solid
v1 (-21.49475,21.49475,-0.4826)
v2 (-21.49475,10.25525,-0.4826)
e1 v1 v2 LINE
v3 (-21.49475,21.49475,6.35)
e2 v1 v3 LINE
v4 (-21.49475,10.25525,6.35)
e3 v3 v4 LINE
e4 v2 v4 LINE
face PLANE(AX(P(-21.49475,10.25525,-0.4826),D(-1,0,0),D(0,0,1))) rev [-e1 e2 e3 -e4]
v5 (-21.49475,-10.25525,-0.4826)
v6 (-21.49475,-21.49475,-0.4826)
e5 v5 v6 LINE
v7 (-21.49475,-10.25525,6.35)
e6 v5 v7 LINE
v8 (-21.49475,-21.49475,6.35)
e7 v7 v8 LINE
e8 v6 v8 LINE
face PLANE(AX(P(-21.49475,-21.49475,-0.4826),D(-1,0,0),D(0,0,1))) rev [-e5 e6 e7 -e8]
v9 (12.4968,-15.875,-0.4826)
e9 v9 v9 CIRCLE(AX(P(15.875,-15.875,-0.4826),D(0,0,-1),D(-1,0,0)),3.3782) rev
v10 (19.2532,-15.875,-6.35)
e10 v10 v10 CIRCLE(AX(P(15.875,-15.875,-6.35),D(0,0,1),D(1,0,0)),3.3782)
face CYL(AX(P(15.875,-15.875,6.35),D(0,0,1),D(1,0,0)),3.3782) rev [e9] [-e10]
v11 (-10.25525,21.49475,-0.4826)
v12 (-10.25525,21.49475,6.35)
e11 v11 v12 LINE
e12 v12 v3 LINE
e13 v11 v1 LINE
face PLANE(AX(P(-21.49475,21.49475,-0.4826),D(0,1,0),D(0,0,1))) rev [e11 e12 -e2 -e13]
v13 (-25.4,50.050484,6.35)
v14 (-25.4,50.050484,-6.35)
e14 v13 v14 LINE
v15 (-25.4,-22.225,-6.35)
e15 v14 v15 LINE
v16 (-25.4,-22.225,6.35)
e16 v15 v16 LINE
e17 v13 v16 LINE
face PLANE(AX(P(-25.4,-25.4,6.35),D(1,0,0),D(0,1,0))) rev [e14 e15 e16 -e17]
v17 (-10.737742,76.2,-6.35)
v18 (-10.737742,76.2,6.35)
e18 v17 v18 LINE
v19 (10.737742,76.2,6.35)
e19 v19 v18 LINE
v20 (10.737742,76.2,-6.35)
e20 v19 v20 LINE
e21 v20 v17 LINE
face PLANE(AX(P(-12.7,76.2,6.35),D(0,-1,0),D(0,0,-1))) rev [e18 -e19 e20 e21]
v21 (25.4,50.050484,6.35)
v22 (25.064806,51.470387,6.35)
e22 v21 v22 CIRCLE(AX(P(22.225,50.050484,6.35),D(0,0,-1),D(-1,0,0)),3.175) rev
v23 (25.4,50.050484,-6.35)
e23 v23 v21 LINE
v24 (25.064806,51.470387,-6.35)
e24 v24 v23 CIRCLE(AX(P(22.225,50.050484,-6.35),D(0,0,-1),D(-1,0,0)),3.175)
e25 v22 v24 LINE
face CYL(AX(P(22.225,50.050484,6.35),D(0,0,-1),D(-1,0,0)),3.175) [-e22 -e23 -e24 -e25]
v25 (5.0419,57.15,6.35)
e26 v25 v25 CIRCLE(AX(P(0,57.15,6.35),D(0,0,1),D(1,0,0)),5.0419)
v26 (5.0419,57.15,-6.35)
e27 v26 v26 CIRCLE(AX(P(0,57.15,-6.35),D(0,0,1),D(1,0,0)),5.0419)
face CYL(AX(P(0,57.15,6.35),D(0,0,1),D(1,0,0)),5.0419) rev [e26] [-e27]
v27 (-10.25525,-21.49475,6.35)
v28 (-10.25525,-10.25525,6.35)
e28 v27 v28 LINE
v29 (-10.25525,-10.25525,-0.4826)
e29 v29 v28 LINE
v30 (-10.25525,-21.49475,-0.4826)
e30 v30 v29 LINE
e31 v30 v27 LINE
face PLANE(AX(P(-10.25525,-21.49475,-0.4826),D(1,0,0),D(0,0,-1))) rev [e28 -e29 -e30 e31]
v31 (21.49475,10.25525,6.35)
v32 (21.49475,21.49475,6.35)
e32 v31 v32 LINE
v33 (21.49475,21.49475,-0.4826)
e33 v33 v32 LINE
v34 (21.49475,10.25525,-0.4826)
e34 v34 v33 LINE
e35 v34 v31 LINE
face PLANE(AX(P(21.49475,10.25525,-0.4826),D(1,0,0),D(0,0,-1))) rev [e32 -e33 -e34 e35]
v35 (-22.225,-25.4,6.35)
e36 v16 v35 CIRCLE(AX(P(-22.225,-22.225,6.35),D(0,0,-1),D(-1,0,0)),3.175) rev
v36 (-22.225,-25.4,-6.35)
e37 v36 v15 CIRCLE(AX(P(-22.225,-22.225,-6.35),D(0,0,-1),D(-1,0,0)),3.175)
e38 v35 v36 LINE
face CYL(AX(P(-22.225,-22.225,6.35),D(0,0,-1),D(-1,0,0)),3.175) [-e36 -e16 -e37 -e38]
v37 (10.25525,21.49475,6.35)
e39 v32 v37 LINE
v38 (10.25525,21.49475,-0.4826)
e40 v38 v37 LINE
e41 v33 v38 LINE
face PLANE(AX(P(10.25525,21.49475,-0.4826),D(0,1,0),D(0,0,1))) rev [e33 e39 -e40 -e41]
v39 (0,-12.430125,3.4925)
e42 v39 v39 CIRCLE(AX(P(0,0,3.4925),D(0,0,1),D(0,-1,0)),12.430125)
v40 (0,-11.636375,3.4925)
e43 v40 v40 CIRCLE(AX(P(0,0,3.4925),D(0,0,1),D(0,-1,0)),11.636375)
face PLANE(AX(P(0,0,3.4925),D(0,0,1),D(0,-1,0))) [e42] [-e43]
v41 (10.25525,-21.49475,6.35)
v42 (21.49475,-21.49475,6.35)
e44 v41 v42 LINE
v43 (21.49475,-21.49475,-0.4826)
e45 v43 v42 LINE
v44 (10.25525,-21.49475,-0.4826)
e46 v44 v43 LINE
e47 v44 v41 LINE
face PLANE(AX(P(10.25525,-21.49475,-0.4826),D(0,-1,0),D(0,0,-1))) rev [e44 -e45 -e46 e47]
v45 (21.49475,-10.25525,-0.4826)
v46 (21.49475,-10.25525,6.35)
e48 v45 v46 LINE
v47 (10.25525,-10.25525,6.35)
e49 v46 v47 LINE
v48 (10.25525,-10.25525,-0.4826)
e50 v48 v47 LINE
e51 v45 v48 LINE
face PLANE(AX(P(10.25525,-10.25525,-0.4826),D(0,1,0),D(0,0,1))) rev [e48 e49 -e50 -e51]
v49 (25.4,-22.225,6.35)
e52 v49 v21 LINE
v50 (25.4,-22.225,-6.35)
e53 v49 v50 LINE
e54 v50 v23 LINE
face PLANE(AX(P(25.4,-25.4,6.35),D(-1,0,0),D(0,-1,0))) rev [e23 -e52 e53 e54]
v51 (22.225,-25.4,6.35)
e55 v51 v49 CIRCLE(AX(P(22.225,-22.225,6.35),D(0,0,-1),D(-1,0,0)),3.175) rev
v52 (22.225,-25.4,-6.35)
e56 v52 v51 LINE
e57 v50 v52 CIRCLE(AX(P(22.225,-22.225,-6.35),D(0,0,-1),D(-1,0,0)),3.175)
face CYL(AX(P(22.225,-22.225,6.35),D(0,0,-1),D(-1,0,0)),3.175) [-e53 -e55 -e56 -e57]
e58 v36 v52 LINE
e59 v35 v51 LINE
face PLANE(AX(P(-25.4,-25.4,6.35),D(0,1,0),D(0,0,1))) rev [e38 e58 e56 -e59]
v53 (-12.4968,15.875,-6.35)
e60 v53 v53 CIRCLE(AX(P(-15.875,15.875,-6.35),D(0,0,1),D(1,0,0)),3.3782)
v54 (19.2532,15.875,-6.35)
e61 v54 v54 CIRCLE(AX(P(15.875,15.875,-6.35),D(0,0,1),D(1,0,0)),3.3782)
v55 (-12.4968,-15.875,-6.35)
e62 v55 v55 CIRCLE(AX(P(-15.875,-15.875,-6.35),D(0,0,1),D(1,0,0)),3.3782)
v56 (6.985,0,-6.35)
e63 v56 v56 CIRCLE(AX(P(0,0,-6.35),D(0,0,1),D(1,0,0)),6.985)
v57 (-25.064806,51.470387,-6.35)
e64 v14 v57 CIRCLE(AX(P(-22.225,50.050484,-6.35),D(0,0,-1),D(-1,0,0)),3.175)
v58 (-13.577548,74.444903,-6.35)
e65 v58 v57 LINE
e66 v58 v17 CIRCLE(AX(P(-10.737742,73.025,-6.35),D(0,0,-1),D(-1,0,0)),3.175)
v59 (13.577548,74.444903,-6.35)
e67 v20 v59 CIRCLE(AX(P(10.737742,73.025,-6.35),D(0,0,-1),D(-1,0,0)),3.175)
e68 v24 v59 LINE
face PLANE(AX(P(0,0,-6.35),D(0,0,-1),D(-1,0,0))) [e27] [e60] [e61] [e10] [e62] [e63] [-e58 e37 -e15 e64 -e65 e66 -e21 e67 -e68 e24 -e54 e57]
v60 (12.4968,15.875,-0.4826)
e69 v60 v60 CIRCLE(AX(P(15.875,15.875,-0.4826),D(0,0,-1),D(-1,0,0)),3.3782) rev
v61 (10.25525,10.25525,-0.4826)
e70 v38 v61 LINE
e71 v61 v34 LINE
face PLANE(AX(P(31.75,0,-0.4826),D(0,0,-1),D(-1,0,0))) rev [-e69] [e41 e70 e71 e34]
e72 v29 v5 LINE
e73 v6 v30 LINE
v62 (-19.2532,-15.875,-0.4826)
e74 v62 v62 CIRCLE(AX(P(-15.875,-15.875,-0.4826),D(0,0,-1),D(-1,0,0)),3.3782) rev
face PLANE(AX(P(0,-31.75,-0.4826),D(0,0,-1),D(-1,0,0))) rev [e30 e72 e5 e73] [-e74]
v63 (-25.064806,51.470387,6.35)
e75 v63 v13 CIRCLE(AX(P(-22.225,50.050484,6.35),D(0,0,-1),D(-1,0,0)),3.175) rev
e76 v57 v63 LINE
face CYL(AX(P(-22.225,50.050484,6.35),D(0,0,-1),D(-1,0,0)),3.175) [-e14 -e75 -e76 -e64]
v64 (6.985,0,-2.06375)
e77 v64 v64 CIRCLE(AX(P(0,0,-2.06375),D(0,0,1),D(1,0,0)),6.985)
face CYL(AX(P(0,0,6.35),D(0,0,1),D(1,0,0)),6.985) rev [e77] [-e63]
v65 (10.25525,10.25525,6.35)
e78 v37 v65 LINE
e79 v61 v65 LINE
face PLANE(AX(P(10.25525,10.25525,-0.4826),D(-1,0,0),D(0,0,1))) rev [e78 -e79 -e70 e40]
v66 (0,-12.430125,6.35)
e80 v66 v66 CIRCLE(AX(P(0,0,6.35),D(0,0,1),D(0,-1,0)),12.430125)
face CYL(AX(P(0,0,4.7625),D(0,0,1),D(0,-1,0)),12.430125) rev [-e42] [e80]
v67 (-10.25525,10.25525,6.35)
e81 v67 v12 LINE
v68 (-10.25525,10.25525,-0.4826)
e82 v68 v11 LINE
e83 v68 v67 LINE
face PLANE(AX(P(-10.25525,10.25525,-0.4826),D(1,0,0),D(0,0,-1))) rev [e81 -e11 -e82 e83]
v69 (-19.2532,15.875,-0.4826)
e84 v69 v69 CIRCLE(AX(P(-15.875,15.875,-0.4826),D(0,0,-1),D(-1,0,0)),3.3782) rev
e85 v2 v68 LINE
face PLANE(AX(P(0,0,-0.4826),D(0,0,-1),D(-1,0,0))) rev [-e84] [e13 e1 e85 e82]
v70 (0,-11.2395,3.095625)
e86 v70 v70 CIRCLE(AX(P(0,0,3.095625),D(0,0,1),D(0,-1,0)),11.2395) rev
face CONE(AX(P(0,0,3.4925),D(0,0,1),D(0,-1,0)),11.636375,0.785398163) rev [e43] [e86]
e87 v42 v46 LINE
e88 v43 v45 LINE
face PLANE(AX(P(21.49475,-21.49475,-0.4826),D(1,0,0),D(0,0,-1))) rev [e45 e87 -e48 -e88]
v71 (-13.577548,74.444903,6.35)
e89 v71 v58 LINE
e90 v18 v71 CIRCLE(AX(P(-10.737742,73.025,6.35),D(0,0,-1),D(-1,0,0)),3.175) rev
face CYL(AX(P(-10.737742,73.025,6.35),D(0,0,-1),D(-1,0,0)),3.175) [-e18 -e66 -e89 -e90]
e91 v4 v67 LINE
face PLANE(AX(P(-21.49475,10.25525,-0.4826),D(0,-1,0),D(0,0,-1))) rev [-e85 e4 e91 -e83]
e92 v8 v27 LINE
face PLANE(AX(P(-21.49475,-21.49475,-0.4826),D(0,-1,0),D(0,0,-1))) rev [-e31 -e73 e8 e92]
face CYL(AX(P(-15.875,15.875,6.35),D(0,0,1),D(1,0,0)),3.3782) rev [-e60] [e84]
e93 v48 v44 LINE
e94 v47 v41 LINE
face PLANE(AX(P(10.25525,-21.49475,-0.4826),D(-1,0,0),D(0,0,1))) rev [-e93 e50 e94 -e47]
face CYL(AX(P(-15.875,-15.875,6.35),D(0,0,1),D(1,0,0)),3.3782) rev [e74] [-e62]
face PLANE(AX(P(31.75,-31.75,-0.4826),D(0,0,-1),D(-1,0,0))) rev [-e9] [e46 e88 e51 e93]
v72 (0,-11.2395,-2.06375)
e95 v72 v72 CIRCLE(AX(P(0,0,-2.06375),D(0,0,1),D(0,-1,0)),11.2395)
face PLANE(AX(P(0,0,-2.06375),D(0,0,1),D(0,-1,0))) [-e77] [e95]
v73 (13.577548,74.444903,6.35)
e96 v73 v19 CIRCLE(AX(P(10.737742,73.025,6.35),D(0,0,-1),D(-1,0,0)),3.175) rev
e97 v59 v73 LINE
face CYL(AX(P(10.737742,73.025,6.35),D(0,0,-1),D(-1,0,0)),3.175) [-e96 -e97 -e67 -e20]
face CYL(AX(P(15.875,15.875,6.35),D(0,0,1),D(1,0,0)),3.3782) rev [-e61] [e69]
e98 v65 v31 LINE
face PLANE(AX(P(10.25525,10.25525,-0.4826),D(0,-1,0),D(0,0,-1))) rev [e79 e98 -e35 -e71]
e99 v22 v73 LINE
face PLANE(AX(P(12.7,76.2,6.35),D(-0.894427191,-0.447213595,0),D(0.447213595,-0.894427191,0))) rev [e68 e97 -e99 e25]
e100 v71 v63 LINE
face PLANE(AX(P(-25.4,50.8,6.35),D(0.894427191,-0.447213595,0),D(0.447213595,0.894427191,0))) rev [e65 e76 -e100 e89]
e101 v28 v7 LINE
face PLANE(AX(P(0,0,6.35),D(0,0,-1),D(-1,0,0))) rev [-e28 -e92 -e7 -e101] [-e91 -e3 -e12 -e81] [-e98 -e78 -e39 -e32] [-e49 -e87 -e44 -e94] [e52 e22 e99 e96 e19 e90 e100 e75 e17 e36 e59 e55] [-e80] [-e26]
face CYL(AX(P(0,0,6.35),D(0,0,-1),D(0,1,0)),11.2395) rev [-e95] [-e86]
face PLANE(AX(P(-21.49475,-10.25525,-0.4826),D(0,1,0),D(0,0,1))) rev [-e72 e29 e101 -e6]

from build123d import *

# Parameters (mm, degrees)
BOSS_EXTRUDE1_DEPTH     = 6.35
F_3_8_CLEARANCE_HOLE1_D = 10.0838
BODY_MOVE_COPY2_ANGLE   = 90
F_1_4_CLEARANCE_HOLE1_D = 6.7564
SKETCH6_W               = 11.2395
SKETCH6_H               = 11.2395
CUT_EXTRUDE1_DEPTH      = 6.8326
F_3_8_CLEARANCE_HOLE3_D = 10.0838
FILLET1_R               = 3.175
F_3_8_CLEARANCE_HOLE2_D = 13.97


with BuildPart() as part:
    # Sketch2 → Boss-Extrude1 (new, symmetric)
    with BuildSketch(Plane.XY):
        Polygon((-25.4, -25.4), (25.4, -25.4), (25.4, 50.8), (12.7, 76.2), (-12.7, 76.2), (-25.4, 50.8), align=None)
    extrude(amount=BOSS_EXTRUDE1_DEPTH, both=True)

    # 3/8 Clearance Hole1 (through all)
    with Locations(Plane.XY.offset(6.35)):
        with Locations((0, 0), (0, 57.15)):
            Hole(F_3_8_CLEARANCE_HOLE1_D / 2)


with BuildPart() as body_2:
    # uxcell-FR6ZZ: read off the stored shape, not the designer's step
    # uxcell-FR6ZZ outline → uxcell-FR6ZZ (revolve)
    with BuildSketch(Plane(origin=(-48.38860798, 0, 0), x_dir=(1, 0, 0), z_dir=(0, 0, 1))):
        Polygon((12.430125, 12.468326067), (4.7625, 12.468326067), (4.7625, 4.054576067), (11.2395, 4.054576067), (11.2395, 9.213951067), (11.636375, 9.610826067), (12.430125, 9.610826067), align=None)
    revolve(axis=Axis((-48.38860798, 0, 0), (0, 1, 0)))


with BuildPart() as body_2_1:
    # Body-Move/Copy2: read off the stored shape, not the designer's step
    # Body-Move/Copy2: moved
    add(body_2.part.moved(Location((48.388608, -6.1183261, 0))).rotate(Axis((0, 0, 0), (1, 0, 0)), BODY_MOVE_COPY2_ANGLE))


with BuildPart() as part_1:
    add(part.part)

    # Combine1: cut body 2
    add(body_2_1.part, mode=Mode.SUBTRACT)

    # 1/4 Clearance Hole1 (through all)
    with Locations(Plane.XY.offset(6.35)):
        with Locations((-15.875, 15.875), (15.875, 15.875), (15.875, -15.875), (-15.875, -15.875)):
            Hole(F_1_4_CLEARANCE_HOLE1_D / 2)

    # Sketch6 → Cut-Extrude1 (cut)
    with BuildSketch(Plane.XY.offset(6.35)):
        with Locations((-15.875, 15.875)):
            Rectangle(SKETCH6_W, SKETCH6_H)
    cut_extrude1 = extrude(amount=-CUT_EXTRUDE1_DEPTH, mode=Mode.SUBTRACT)

    # Sketch-Pattern1: Cut-Extrude1 at 3 more places
    with Locations((0, -31.75, 0), (31.75, -31.75, 0), (31.75, 0, 0)):
        add(cut_extrude1, mode=Mode.SUBTRACT)

    # 3/8 Clearance Hole3 (through all)
    with Locations(Plane(origin=(0, 0, -6.35), x_dir=(-1, 0, 0), z_dir=(0, 0, -1))):
        with Locations((0, 57.15)):
            Hole(F_3_8_CLEARANCE_HOLE3_D / 2)

    # Fillet1
    fillet1_edges = [part_1.edges().sort_by_distance(p)[0] for p in [
        (-25.4, 50.8, 0),
        (-12.7, 76.2, 0),
        (12.7, 76.2, 0),
        (25.4, 50.8, 0),
        (25.4, -25.4, 0),
        (-25.4, -25.4, 0),
    ]]
    fillet(fillet1_edges, radius=FILLET1_R)

    # 3/8 Clearance Hole2 (through all)
    with Locations(Plane.XY.offset(6.35)):
        with Locations((0, 0)):
            Hole(F_3_8_CLEARANCE_HOLE2_D / 2)


solid = part_1.part
